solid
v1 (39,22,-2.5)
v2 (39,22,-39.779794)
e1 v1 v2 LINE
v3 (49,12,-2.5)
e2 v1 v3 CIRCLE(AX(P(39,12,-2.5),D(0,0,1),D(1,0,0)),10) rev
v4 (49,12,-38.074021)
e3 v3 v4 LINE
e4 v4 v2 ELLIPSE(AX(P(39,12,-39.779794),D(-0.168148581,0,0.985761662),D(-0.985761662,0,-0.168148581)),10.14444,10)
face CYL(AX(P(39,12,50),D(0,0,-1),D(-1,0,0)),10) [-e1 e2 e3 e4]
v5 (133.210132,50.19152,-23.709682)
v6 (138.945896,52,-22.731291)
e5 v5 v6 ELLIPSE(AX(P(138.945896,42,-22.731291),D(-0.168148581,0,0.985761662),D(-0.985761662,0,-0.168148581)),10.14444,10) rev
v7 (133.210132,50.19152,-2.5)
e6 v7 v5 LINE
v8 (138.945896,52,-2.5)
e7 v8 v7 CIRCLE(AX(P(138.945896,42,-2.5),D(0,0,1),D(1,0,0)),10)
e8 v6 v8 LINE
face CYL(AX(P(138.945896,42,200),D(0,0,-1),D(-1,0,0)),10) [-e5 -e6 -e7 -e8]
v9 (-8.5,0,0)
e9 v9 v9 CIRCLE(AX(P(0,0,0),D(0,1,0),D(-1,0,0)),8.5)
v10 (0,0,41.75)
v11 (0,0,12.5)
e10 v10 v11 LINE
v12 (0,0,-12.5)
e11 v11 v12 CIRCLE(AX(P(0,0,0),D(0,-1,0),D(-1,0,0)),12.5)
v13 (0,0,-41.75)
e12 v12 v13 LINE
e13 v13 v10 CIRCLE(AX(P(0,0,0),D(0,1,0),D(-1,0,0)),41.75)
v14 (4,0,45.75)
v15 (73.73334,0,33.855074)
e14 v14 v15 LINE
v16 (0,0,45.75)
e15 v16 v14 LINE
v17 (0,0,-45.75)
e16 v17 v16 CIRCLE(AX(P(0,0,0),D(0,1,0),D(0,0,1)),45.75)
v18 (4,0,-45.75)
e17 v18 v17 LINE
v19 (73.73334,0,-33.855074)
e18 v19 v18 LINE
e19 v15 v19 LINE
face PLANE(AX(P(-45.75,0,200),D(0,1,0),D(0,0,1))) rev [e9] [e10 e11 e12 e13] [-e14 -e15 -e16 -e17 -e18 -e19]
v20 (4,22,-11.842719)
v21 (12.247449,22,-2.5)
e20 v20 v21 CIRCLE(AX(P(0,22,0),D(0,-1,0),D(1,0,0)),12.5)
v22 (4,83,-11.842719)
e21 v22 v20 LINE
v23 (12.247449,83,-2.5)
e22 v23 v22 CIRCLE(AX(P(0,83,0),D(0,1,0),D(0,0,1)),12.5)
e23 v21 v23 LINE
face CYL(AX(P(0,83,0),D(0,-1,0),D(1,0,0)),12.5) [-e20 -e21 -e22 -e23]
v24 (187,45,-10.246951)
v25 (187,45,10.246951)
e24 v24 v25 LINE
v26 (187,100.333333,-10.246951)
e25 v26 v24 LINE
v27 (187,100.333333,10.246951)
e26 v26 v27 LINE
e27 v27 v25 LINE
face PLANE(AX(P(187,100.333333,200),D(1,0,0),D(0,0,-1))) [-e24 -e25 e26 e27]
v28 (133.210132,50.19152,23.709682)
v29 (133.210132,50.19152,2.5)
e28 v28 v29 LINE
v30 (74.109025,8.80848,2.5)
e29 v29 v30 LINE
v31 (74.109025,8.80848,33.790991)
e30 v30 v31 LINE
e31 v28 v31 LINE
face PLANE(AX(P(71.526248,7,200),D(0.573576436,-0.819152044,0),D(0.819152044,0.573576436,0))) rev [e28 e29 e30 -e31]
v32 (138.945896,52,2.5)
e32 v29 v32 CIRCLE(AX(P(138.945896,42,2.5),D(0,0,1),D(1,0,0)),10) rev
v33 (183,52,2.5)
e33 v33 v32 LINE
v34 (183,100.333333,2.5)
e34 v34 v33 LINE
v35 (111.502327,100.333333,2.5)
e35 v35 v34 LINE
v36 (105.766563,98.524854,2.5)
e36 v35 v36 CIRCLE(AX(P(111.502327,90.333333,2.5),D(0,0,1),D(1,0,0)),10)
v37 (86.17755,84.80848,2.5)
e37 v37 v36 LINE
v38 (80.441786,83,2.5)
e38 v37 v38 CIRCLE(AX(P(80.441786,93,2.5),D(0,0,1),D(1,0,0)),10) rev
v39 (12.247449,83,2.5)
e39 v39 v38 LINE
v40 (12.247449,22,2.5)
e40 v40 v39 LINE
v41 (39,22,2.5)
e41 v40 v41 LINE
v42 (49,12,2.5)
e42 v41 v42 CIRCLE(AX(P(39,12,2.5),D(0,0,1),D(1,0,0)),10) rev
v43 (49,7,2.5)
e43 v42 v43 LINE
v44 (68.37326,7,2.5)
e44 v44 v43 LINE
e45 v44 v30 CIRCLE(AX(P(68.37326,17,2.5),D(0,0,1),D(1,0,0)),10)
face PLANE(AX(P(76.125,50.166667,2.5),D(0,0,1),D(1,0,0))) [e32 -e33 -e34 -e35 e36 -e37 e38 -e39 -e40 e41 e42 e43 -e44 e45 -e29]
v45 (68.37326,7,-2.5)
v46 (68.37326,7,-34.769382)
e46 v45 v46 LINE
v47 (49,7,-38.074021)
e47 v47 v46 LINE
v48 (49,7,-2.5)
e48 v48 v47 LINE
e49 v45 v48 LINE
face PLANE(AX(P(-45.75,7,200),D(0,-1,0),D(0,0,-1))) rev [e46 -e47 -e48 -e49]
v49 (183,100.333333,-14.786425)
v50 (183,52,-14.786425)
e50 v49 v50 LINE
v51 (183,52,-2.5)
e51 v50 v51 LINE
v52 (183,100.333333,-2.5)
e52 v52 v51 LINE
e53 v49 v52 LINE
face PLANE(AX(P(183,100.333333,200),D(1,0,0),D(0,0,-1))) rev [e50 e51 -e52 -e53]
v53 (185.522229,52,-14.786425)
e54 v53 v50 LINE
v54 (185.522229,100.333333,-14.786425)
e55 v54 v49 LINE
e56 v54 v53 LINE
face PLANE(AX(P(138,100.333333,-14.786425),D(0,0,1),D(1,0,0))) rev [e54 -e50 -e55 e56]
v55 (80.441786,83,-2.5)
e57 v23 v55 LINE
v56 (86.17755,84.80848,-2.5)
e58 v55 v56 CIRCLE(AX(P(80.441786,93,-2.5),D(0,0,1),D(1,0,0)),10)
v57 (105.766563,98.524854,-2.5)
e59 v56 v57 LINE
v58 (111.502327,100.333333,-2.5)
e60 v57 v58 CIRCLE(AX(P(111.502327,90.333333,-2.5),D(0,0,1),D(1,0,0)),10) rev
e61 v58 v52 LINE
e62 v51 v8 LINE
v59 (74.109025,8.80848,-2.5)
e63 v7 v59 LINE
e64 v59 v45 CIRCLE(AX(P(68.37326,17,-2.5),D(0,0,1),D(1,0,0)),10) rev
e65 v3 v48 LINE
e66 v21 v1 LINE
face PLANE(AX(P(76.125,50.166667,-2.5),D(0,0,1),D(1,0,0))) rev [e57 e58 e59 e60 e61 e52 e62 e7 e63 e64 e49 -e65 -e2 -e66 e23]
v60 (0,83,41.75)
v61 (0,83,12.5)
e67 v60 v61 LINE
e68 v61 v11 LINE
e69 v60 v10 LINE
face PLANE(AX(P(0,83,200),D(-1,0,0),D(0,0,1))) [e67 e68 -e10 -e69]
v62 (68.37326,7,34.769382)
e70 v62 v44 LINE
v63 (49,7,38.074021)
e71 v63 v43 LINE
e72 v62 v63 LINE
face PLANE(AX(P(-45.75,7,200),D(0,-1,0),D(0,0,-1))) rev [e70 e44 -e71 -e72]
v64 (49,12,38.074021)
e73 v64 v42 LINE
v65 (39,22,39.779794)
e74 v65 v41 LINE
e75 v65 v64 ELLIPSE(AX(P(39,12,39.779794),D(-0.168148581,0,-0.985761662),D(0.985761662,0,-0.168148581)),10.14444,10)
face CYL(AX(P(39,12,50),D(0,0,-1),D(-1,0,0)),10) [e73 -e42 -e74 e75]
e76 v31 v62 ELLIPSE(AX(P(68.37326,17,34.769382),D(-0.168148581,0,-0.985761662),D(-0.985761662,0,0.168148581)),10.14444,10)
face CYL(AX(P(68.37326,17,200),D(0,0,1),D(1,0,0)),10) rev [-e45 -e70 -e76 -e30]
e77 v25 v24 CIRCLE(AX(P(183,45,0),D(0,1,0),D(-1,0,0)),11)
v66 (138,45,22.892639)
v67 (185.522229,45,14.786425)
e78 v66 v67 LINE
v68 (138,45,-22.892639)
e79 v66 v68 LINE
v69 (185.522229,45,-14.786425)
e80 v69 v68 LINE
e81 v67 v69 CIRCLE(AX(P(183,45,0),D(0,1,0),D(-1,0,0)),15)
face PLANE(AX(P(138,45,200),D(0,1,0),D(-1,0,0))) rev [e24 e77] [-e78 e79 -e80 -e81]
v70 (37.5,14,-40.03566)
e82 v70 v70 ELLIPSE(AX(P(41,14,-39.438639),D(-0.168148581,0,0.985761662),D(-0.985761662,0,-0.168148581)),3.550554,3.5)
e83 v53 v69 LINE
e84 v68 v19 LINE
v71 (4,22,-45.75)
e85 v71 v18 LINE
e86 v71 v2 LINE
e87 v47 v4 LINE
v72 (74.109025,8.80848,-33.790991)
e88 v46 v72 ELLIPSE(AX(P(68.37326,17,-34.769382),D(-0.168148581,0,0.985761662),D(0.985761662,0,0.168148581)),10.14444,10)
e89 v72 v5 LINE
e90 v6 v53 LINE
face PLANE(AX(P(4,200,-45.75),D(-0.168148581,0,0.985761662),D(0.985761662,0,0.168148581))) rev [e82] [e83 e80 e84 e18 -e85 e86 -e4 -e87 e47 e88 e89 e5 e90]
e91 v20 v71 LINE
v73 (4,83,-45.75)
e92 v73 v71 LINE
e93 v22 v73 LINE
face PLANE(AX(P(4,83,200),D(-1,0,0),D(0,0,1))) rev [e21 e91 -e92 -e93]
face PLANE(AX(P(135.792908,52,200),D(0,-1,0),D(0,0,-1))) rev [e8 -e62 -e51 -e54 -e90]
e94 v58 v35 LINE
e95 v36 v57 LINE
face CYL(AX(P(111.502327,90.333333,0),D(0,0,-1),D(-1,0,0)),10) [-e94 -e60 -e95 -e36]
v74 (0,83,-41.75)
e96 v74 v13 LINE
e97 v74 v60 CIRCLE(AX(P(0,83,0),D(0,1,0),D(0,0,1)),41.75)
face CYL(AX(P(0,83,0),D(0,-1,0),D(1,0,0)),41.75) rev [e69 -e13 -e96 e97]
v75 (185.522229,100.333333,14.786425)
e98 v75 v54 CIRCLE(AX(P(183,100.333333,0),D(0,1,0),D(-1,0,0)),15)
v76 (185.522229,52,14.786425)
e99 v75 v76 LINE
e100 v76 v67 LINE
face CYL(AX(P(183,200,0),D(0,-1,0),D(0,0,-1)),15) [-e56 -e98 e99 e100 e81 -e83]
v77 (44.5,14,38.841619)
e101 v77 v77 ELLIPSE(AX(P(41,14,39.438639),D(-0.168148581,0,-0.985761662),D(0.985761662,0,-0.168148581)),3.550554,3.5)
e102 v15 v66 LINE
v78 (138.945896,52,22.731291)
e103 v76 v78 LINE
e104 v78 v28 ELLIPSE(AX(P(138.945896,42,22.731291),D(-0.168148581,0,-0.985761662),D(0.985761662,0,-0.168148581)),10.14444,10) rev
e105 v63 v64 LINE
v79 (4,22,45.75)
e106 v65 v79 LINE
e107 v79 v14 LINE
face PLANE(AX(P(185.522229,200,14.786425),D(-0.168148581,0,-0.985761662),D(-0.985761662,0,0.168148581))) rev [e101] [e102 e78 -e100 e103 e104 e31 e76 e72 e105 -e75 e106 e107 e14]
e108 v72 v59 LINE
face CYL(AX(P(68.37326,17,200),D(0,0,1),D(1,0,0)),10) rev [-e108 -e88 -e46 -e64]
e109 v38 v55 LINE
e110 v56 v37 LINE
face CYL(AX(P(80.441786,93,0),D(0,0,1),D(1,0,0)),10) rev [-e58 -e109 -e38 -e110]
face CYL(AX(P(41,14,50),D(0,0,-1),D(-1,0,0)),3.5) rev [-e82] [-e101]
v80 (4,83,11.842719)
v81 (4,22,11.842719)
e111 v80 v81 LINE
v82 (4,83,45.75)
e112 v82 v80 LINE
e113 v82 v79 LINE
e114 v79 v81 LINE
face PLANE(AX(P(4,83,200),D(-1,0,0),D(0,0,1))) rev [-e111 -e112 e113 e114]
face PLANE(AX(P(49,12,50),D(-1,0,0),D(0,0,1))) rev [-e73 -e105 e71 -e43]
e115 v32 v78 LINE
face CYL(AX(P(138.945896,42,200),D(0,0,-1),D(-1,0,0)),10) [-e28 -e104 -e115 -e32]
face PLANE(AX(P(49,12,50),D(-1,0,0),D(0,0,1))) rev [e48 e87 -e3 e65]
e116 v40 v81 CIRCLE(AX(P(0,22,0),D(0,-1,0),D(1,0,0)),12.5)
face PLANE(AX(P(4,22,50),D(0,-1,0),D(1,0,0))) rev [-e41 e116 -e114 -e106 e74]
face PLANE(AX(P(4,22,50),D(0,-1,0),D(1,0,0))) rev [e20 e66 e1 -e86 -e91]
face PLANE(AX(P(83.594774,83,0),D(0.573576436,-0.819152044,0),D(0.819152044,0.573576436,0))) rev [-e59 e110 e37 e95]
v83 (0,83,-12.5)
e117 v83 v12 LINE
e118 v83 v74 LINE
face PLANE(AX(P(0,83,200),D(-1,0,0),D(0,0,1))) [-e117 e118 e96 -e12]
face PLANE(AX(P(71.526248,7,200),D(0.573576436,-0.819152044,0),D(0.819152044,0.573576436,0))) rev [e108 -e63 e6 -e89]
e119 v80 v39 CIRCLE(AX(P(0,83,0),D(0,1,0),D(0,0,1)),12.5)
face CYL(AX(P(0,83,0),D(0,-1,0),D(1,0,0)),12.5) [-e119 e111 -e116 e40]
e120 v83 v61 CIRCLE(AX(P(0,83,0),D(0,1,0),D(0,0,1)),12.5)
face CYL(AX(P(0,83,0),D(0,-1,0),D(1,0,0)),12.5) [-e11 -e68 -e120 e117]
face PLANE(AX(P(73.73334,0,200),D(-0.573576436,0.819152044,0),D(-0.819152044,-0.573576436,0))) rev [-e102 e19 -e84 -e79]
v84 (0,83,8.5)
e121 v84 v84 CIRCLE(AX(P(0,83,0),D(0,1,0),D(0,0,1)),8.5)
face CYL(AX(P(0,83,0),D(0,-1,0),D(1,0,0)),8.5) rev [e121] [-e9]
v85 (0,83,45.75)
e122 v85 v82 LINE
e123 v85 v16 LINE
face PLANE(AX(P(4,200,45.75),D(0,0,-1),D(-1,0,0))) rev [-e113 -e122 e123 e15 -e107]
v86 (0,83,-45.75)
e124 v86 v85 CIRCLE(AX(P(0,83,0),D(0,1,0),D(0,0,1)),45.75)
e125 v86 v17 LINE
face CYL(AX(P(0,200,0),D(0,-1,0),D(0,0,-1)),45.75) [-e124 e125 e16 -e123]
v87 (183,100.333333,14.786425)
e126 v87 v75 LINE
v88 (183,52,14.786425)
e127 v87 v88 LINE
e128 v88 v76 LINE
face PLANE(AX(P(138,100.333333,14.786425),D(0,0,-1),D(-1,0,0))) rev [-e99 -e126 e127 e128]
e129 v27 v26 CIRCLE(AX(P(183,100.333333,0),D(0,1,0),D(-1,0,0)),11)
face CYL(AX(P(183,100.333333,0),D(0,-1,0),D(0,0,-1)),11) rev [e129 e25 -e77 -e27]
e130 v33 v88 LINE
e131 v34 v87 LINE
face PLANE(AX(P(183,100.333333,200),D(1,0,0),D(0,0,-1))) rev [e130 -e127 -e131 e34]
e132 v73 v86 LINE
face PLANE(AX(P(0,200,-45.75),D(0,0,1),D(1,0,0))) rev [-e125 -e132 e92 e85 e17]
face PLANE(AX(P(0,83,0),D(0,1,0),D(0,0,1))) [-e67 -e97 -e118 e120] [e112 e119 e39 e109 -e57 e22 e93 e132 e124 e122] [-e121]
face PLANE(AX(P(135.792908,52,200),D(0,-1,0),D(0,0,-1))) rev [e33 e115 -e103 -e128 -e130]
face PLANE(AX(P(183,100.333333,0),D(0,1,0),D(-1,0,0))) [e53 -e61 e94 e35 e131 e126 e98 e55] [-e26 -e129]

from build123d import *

# Parameters (mm, degrees)
BOSS_EXTRUDE1_DEPTH     = 200
BOSS_EXTRUDE2_DEPTH     = 200
BOSS_EXTRUDE3_START     = 76
SKETCH4_R               = 8.5
BOSS_EXTRUDE3_DEPTH     = 83
BOSS_EXTRUDE4_START     = 48.333333333
BOSS_EXTRUDE4_DEPTH     = 55.333333333
RIB1_START              = -2.5
RIB1_DEPTH              = 5
FILLET3_R               = 10
SKETCH9_R               = 3.5
BOSS_EXTRUDE6_DEPTH     = 50
CUT_EXTRUDE3_DEPTH      = 244.455905202
CUT_EXTRUDE3_DEPTH_BACK = 244.455905202
SKETCH10_R              = 3.5
CUT_EXTRUDE4_DEPTH      = 219.723823831
CUT_EXTRUDE4_DEPTH_BACK = 219.723823831
CUT_EXTRUDE2_DEPTH      = 220.51323992
CUT_EXTRUDE2_DEPTH_BACK = 220.51323992
SKETCH7_R               = 8.5


# Read off the part's stored shape, not the designer's step: Rib1
with BuildPart() as part:
    # Sketch1 → Boss-Extrude1 (new, symmetric)
    with BuildSketch(Plane(origin=(0, 0, 0), x_dir=(1, 0, 0), z_dir=(0, 1, 0))):
        with BuildLine():
            Line((0, 45.75), (4, 45.75))
            Line((4, 45.75), (185.522228719, 14.786424933))
            ThreePointArc((185.522228719, 14.786424933), (198, 0), (185.522228719, -14.786424933))
            Line((185.522228719, -14.786424933), (4, -45.75))
            Line((4, -45.75), (0, -45.75))
            ThreePointArc((0, -45.75), (-45.75, 0), (0, 45.75))
        make_face()
    extrude(amount=BOSS_EXTRUDE1_DEPTH, both=True)


with BuildPart() as body_2:
    # Sketch3 → Boss-Extrude2 (new, symmetric)
    with BuildSketch(Plane.XY):
        Polygon((-45.75, 0), (73.733339697, 0), (138, 45), (198, 45), (198, 52), (135.792908478, 52), (71.526248174, 7), (-45.75, 7), align=None)
    extrude(amount=BOSS_EXTRUDE2_DEPTH, both=True)


with BuildPart() as part_1:
    add(part.part)

    # Combine1: intersect body 2
    add(body_2.part, mode=Mode.INTERSECT)

    # Sketch4 → Boss-Extrude3 (add)
    with BuildSketch(Plane(origin=(0, 7, 0), x_dir=(1, 0, 0), z_dir=(0, 1, 0)).offset(BOSS_EXTRUDE3_START)):
        with BuildLine():
            Line((0, -45.75), (4, -45.75))
            Line((4, -45.75), (4, -11.842719282))
            ThreePointArc((4, -11.842719282), (12.5, 0), (4, 11.842719282))
            Line((4, 11.842719282), (4, 45.75))
            Line((4, 45.75), (0, 45.75))
            ThreePointArc((0, 45.75), (-45.75, 0), (0, -45.75))
        make_face()
        with Locations(Location((0, 0, 0), (0, 0, 270))):
            Circle(SKETCH4_R, mode=Mode.SUBTRACT)
        with BuildLine():
            Line((0, -41.75), (0, -12.5))
            ThreePointArc((0, -12.5), (-12.5, 0), (0, 12.5))
            Line((0, 12.5), (0, 41.75))
            ThreePointArc((0, 41.75), (-41.75, 0), (0, -41.75))
        make_face(mode=Mode.SUBTRACT)
    extrude(amount=-BOSS_EXTRUDE3_DEPTH)

    # Sketch5 → Boss-Extrude4 (add)
    with BuildSketch(Plane(origin=(0, 52, 0), x_dir=(1, 0, 0), z_dir=(0, 1, 0)).offset(BOSS_EXTRUDE4_START)):
        with BuildLine():
            Line((185.522228719, -14.786424933), (183, -14.786424933))
            Line((183, -14.786424933), (183, 14.786424933))
            Line((183, 14.786424933), (185.522228719, 14.786424933))
            ThreePointArc((185.522228719, 14.786424933), (198, 0), (185.522228719, -14.786424933))
        make_face()
        with BuildLine():
            Line((187, -10.246950766), (187, 10.246950766))
            ThreePointArc((187, 10.246950766), (194, 0), (187, -10.246950766))
        make_face(mode=Mode.SUBTRACT)
    extrude(amount=-BOSS_EXTRUDE4_DEPTH)

    # Rib1 outline → Rib1 (add)
    with BuildSketch(Plane.XY.offset(RIB1_START)):
        Polygon((108.349339446, 100.333333333), (83.594773996, 83), (11, 83), (11, 7), (71.526248174, 7), (135.792908478, 52), (183, 52), (183, 100.333333333), align=None)
    extrude(amount=RIB1_DEPTH)

    # Fillet3
    fillet3_edges = [part_1.edges().sort_by_distance(p)[0] for p in [
        (135.792908478, 52, -12.884559521),
        (71.526248174, 7, -18.365776821),
        (108.349339446, 100.333333333, 0),
        (83.594773996, 83, 0),
        (135.792908478, 52, 12.884559521),
        (71.526248174, 7, 18.365776821),
    ]]
    fillet(fillet3_edges, radius=FILLET3_R)

    # Sketch9 → Boss-Extrude6 (add, symmetric)
    with BuildSketch(Plane.XY):
        with BuildLine():
            Line((4, 7), (4, 22))
            Line((4, 22), (39, 22))
            ThreePointArc((39, 22), (46.071067812, 19.071067812), (49, 12))
            Line((49, 12), (49, 7))
            Line((49, 7), (4, 7))
        make_face()
        with Locations((41, 14)):
            Circle(SKETCH9_R, mode=Mode.SUBTRACT)
    extrude(amount=BOSS_EXTRUDE6_DEPTH, both=True)

    # Sketch10 → Cut-Extrude3 (cut, two sides: drawn at the far end of the back side and taken through both)
    with BuildSketch(Plane.XY.offset(50).offset(-CUT_EXTRUDE3_DEPTH_BACK)):
        with Locations((41, 14)):
            Circle(SKETCH10_R)
    extrude(amount=CUT_EXTRUDE3_DEPTH + CUT_EXTRUDE3_DEPTH_BACK, mode=Mode.SUBTRACT)

    # Sketch11 → Cut-Extrude4 (cut, two sides: drawn at the far end of the back side and taken through both)
    with BuildSketch(Plane(origin=(0, 22, 0), x_dir=(1, 0, 0), z_dir=(0, 1, 0)).offset(-CUT_EXTRUDE4_DEPTH_BACK)):
        Polygon((4, -45.75), (49, -38.074020657), (49, -50), (4, -50), align=None)
        Polygon((4, 45.75), (49, 38.074020657), (49, 50), (4, 50), align=None)
    extrude(amount=CUT_EXTRUDE4_DEPTH + CUT_EXTRUDE4_DEPTH_BACK, mode=Mode.SUBTRACT)

    # Sketch7 → Cut-Extrude2 (cut, two sides: drawn at the far end of the back side and taken through both)
    with BuildSketch(Plane(origin=(0, 83, 0), x_dir=(1, 0, 0), z_dir=(0, 1, 0)).offset(-CUT_EXTRUDE2_DEPTH_BACK)):
        with Locations(Location((0, 0, 0), (0, 0, 270))):
            Circle(SKETCH7_R)
        with BuildLine():
            Line((187, 10.246950766), (187, -10.246950766))
            ThreePointArc((187, -10.246950766), (194, 0), (187, 10.246950766))
        make_face()
        with BuildLine():
            Line((0, 12.5), (0, 41.75))
            ThreePointArc((0, 41.75), (-41.75, 0), (0, -41.75))
            Line((0, -41.75), (0, -12.5))
            ThreePointArc((0, -12.5), (-12.5, 0), (0, 12.5))
        make_face()
    extrude(amount=CUT_EXTRUDE2_DEPTH + CUT_EXTRUDE2_DEPTH_BACK, mode=Mode.SUBTRACT)


solid = part_1.part
